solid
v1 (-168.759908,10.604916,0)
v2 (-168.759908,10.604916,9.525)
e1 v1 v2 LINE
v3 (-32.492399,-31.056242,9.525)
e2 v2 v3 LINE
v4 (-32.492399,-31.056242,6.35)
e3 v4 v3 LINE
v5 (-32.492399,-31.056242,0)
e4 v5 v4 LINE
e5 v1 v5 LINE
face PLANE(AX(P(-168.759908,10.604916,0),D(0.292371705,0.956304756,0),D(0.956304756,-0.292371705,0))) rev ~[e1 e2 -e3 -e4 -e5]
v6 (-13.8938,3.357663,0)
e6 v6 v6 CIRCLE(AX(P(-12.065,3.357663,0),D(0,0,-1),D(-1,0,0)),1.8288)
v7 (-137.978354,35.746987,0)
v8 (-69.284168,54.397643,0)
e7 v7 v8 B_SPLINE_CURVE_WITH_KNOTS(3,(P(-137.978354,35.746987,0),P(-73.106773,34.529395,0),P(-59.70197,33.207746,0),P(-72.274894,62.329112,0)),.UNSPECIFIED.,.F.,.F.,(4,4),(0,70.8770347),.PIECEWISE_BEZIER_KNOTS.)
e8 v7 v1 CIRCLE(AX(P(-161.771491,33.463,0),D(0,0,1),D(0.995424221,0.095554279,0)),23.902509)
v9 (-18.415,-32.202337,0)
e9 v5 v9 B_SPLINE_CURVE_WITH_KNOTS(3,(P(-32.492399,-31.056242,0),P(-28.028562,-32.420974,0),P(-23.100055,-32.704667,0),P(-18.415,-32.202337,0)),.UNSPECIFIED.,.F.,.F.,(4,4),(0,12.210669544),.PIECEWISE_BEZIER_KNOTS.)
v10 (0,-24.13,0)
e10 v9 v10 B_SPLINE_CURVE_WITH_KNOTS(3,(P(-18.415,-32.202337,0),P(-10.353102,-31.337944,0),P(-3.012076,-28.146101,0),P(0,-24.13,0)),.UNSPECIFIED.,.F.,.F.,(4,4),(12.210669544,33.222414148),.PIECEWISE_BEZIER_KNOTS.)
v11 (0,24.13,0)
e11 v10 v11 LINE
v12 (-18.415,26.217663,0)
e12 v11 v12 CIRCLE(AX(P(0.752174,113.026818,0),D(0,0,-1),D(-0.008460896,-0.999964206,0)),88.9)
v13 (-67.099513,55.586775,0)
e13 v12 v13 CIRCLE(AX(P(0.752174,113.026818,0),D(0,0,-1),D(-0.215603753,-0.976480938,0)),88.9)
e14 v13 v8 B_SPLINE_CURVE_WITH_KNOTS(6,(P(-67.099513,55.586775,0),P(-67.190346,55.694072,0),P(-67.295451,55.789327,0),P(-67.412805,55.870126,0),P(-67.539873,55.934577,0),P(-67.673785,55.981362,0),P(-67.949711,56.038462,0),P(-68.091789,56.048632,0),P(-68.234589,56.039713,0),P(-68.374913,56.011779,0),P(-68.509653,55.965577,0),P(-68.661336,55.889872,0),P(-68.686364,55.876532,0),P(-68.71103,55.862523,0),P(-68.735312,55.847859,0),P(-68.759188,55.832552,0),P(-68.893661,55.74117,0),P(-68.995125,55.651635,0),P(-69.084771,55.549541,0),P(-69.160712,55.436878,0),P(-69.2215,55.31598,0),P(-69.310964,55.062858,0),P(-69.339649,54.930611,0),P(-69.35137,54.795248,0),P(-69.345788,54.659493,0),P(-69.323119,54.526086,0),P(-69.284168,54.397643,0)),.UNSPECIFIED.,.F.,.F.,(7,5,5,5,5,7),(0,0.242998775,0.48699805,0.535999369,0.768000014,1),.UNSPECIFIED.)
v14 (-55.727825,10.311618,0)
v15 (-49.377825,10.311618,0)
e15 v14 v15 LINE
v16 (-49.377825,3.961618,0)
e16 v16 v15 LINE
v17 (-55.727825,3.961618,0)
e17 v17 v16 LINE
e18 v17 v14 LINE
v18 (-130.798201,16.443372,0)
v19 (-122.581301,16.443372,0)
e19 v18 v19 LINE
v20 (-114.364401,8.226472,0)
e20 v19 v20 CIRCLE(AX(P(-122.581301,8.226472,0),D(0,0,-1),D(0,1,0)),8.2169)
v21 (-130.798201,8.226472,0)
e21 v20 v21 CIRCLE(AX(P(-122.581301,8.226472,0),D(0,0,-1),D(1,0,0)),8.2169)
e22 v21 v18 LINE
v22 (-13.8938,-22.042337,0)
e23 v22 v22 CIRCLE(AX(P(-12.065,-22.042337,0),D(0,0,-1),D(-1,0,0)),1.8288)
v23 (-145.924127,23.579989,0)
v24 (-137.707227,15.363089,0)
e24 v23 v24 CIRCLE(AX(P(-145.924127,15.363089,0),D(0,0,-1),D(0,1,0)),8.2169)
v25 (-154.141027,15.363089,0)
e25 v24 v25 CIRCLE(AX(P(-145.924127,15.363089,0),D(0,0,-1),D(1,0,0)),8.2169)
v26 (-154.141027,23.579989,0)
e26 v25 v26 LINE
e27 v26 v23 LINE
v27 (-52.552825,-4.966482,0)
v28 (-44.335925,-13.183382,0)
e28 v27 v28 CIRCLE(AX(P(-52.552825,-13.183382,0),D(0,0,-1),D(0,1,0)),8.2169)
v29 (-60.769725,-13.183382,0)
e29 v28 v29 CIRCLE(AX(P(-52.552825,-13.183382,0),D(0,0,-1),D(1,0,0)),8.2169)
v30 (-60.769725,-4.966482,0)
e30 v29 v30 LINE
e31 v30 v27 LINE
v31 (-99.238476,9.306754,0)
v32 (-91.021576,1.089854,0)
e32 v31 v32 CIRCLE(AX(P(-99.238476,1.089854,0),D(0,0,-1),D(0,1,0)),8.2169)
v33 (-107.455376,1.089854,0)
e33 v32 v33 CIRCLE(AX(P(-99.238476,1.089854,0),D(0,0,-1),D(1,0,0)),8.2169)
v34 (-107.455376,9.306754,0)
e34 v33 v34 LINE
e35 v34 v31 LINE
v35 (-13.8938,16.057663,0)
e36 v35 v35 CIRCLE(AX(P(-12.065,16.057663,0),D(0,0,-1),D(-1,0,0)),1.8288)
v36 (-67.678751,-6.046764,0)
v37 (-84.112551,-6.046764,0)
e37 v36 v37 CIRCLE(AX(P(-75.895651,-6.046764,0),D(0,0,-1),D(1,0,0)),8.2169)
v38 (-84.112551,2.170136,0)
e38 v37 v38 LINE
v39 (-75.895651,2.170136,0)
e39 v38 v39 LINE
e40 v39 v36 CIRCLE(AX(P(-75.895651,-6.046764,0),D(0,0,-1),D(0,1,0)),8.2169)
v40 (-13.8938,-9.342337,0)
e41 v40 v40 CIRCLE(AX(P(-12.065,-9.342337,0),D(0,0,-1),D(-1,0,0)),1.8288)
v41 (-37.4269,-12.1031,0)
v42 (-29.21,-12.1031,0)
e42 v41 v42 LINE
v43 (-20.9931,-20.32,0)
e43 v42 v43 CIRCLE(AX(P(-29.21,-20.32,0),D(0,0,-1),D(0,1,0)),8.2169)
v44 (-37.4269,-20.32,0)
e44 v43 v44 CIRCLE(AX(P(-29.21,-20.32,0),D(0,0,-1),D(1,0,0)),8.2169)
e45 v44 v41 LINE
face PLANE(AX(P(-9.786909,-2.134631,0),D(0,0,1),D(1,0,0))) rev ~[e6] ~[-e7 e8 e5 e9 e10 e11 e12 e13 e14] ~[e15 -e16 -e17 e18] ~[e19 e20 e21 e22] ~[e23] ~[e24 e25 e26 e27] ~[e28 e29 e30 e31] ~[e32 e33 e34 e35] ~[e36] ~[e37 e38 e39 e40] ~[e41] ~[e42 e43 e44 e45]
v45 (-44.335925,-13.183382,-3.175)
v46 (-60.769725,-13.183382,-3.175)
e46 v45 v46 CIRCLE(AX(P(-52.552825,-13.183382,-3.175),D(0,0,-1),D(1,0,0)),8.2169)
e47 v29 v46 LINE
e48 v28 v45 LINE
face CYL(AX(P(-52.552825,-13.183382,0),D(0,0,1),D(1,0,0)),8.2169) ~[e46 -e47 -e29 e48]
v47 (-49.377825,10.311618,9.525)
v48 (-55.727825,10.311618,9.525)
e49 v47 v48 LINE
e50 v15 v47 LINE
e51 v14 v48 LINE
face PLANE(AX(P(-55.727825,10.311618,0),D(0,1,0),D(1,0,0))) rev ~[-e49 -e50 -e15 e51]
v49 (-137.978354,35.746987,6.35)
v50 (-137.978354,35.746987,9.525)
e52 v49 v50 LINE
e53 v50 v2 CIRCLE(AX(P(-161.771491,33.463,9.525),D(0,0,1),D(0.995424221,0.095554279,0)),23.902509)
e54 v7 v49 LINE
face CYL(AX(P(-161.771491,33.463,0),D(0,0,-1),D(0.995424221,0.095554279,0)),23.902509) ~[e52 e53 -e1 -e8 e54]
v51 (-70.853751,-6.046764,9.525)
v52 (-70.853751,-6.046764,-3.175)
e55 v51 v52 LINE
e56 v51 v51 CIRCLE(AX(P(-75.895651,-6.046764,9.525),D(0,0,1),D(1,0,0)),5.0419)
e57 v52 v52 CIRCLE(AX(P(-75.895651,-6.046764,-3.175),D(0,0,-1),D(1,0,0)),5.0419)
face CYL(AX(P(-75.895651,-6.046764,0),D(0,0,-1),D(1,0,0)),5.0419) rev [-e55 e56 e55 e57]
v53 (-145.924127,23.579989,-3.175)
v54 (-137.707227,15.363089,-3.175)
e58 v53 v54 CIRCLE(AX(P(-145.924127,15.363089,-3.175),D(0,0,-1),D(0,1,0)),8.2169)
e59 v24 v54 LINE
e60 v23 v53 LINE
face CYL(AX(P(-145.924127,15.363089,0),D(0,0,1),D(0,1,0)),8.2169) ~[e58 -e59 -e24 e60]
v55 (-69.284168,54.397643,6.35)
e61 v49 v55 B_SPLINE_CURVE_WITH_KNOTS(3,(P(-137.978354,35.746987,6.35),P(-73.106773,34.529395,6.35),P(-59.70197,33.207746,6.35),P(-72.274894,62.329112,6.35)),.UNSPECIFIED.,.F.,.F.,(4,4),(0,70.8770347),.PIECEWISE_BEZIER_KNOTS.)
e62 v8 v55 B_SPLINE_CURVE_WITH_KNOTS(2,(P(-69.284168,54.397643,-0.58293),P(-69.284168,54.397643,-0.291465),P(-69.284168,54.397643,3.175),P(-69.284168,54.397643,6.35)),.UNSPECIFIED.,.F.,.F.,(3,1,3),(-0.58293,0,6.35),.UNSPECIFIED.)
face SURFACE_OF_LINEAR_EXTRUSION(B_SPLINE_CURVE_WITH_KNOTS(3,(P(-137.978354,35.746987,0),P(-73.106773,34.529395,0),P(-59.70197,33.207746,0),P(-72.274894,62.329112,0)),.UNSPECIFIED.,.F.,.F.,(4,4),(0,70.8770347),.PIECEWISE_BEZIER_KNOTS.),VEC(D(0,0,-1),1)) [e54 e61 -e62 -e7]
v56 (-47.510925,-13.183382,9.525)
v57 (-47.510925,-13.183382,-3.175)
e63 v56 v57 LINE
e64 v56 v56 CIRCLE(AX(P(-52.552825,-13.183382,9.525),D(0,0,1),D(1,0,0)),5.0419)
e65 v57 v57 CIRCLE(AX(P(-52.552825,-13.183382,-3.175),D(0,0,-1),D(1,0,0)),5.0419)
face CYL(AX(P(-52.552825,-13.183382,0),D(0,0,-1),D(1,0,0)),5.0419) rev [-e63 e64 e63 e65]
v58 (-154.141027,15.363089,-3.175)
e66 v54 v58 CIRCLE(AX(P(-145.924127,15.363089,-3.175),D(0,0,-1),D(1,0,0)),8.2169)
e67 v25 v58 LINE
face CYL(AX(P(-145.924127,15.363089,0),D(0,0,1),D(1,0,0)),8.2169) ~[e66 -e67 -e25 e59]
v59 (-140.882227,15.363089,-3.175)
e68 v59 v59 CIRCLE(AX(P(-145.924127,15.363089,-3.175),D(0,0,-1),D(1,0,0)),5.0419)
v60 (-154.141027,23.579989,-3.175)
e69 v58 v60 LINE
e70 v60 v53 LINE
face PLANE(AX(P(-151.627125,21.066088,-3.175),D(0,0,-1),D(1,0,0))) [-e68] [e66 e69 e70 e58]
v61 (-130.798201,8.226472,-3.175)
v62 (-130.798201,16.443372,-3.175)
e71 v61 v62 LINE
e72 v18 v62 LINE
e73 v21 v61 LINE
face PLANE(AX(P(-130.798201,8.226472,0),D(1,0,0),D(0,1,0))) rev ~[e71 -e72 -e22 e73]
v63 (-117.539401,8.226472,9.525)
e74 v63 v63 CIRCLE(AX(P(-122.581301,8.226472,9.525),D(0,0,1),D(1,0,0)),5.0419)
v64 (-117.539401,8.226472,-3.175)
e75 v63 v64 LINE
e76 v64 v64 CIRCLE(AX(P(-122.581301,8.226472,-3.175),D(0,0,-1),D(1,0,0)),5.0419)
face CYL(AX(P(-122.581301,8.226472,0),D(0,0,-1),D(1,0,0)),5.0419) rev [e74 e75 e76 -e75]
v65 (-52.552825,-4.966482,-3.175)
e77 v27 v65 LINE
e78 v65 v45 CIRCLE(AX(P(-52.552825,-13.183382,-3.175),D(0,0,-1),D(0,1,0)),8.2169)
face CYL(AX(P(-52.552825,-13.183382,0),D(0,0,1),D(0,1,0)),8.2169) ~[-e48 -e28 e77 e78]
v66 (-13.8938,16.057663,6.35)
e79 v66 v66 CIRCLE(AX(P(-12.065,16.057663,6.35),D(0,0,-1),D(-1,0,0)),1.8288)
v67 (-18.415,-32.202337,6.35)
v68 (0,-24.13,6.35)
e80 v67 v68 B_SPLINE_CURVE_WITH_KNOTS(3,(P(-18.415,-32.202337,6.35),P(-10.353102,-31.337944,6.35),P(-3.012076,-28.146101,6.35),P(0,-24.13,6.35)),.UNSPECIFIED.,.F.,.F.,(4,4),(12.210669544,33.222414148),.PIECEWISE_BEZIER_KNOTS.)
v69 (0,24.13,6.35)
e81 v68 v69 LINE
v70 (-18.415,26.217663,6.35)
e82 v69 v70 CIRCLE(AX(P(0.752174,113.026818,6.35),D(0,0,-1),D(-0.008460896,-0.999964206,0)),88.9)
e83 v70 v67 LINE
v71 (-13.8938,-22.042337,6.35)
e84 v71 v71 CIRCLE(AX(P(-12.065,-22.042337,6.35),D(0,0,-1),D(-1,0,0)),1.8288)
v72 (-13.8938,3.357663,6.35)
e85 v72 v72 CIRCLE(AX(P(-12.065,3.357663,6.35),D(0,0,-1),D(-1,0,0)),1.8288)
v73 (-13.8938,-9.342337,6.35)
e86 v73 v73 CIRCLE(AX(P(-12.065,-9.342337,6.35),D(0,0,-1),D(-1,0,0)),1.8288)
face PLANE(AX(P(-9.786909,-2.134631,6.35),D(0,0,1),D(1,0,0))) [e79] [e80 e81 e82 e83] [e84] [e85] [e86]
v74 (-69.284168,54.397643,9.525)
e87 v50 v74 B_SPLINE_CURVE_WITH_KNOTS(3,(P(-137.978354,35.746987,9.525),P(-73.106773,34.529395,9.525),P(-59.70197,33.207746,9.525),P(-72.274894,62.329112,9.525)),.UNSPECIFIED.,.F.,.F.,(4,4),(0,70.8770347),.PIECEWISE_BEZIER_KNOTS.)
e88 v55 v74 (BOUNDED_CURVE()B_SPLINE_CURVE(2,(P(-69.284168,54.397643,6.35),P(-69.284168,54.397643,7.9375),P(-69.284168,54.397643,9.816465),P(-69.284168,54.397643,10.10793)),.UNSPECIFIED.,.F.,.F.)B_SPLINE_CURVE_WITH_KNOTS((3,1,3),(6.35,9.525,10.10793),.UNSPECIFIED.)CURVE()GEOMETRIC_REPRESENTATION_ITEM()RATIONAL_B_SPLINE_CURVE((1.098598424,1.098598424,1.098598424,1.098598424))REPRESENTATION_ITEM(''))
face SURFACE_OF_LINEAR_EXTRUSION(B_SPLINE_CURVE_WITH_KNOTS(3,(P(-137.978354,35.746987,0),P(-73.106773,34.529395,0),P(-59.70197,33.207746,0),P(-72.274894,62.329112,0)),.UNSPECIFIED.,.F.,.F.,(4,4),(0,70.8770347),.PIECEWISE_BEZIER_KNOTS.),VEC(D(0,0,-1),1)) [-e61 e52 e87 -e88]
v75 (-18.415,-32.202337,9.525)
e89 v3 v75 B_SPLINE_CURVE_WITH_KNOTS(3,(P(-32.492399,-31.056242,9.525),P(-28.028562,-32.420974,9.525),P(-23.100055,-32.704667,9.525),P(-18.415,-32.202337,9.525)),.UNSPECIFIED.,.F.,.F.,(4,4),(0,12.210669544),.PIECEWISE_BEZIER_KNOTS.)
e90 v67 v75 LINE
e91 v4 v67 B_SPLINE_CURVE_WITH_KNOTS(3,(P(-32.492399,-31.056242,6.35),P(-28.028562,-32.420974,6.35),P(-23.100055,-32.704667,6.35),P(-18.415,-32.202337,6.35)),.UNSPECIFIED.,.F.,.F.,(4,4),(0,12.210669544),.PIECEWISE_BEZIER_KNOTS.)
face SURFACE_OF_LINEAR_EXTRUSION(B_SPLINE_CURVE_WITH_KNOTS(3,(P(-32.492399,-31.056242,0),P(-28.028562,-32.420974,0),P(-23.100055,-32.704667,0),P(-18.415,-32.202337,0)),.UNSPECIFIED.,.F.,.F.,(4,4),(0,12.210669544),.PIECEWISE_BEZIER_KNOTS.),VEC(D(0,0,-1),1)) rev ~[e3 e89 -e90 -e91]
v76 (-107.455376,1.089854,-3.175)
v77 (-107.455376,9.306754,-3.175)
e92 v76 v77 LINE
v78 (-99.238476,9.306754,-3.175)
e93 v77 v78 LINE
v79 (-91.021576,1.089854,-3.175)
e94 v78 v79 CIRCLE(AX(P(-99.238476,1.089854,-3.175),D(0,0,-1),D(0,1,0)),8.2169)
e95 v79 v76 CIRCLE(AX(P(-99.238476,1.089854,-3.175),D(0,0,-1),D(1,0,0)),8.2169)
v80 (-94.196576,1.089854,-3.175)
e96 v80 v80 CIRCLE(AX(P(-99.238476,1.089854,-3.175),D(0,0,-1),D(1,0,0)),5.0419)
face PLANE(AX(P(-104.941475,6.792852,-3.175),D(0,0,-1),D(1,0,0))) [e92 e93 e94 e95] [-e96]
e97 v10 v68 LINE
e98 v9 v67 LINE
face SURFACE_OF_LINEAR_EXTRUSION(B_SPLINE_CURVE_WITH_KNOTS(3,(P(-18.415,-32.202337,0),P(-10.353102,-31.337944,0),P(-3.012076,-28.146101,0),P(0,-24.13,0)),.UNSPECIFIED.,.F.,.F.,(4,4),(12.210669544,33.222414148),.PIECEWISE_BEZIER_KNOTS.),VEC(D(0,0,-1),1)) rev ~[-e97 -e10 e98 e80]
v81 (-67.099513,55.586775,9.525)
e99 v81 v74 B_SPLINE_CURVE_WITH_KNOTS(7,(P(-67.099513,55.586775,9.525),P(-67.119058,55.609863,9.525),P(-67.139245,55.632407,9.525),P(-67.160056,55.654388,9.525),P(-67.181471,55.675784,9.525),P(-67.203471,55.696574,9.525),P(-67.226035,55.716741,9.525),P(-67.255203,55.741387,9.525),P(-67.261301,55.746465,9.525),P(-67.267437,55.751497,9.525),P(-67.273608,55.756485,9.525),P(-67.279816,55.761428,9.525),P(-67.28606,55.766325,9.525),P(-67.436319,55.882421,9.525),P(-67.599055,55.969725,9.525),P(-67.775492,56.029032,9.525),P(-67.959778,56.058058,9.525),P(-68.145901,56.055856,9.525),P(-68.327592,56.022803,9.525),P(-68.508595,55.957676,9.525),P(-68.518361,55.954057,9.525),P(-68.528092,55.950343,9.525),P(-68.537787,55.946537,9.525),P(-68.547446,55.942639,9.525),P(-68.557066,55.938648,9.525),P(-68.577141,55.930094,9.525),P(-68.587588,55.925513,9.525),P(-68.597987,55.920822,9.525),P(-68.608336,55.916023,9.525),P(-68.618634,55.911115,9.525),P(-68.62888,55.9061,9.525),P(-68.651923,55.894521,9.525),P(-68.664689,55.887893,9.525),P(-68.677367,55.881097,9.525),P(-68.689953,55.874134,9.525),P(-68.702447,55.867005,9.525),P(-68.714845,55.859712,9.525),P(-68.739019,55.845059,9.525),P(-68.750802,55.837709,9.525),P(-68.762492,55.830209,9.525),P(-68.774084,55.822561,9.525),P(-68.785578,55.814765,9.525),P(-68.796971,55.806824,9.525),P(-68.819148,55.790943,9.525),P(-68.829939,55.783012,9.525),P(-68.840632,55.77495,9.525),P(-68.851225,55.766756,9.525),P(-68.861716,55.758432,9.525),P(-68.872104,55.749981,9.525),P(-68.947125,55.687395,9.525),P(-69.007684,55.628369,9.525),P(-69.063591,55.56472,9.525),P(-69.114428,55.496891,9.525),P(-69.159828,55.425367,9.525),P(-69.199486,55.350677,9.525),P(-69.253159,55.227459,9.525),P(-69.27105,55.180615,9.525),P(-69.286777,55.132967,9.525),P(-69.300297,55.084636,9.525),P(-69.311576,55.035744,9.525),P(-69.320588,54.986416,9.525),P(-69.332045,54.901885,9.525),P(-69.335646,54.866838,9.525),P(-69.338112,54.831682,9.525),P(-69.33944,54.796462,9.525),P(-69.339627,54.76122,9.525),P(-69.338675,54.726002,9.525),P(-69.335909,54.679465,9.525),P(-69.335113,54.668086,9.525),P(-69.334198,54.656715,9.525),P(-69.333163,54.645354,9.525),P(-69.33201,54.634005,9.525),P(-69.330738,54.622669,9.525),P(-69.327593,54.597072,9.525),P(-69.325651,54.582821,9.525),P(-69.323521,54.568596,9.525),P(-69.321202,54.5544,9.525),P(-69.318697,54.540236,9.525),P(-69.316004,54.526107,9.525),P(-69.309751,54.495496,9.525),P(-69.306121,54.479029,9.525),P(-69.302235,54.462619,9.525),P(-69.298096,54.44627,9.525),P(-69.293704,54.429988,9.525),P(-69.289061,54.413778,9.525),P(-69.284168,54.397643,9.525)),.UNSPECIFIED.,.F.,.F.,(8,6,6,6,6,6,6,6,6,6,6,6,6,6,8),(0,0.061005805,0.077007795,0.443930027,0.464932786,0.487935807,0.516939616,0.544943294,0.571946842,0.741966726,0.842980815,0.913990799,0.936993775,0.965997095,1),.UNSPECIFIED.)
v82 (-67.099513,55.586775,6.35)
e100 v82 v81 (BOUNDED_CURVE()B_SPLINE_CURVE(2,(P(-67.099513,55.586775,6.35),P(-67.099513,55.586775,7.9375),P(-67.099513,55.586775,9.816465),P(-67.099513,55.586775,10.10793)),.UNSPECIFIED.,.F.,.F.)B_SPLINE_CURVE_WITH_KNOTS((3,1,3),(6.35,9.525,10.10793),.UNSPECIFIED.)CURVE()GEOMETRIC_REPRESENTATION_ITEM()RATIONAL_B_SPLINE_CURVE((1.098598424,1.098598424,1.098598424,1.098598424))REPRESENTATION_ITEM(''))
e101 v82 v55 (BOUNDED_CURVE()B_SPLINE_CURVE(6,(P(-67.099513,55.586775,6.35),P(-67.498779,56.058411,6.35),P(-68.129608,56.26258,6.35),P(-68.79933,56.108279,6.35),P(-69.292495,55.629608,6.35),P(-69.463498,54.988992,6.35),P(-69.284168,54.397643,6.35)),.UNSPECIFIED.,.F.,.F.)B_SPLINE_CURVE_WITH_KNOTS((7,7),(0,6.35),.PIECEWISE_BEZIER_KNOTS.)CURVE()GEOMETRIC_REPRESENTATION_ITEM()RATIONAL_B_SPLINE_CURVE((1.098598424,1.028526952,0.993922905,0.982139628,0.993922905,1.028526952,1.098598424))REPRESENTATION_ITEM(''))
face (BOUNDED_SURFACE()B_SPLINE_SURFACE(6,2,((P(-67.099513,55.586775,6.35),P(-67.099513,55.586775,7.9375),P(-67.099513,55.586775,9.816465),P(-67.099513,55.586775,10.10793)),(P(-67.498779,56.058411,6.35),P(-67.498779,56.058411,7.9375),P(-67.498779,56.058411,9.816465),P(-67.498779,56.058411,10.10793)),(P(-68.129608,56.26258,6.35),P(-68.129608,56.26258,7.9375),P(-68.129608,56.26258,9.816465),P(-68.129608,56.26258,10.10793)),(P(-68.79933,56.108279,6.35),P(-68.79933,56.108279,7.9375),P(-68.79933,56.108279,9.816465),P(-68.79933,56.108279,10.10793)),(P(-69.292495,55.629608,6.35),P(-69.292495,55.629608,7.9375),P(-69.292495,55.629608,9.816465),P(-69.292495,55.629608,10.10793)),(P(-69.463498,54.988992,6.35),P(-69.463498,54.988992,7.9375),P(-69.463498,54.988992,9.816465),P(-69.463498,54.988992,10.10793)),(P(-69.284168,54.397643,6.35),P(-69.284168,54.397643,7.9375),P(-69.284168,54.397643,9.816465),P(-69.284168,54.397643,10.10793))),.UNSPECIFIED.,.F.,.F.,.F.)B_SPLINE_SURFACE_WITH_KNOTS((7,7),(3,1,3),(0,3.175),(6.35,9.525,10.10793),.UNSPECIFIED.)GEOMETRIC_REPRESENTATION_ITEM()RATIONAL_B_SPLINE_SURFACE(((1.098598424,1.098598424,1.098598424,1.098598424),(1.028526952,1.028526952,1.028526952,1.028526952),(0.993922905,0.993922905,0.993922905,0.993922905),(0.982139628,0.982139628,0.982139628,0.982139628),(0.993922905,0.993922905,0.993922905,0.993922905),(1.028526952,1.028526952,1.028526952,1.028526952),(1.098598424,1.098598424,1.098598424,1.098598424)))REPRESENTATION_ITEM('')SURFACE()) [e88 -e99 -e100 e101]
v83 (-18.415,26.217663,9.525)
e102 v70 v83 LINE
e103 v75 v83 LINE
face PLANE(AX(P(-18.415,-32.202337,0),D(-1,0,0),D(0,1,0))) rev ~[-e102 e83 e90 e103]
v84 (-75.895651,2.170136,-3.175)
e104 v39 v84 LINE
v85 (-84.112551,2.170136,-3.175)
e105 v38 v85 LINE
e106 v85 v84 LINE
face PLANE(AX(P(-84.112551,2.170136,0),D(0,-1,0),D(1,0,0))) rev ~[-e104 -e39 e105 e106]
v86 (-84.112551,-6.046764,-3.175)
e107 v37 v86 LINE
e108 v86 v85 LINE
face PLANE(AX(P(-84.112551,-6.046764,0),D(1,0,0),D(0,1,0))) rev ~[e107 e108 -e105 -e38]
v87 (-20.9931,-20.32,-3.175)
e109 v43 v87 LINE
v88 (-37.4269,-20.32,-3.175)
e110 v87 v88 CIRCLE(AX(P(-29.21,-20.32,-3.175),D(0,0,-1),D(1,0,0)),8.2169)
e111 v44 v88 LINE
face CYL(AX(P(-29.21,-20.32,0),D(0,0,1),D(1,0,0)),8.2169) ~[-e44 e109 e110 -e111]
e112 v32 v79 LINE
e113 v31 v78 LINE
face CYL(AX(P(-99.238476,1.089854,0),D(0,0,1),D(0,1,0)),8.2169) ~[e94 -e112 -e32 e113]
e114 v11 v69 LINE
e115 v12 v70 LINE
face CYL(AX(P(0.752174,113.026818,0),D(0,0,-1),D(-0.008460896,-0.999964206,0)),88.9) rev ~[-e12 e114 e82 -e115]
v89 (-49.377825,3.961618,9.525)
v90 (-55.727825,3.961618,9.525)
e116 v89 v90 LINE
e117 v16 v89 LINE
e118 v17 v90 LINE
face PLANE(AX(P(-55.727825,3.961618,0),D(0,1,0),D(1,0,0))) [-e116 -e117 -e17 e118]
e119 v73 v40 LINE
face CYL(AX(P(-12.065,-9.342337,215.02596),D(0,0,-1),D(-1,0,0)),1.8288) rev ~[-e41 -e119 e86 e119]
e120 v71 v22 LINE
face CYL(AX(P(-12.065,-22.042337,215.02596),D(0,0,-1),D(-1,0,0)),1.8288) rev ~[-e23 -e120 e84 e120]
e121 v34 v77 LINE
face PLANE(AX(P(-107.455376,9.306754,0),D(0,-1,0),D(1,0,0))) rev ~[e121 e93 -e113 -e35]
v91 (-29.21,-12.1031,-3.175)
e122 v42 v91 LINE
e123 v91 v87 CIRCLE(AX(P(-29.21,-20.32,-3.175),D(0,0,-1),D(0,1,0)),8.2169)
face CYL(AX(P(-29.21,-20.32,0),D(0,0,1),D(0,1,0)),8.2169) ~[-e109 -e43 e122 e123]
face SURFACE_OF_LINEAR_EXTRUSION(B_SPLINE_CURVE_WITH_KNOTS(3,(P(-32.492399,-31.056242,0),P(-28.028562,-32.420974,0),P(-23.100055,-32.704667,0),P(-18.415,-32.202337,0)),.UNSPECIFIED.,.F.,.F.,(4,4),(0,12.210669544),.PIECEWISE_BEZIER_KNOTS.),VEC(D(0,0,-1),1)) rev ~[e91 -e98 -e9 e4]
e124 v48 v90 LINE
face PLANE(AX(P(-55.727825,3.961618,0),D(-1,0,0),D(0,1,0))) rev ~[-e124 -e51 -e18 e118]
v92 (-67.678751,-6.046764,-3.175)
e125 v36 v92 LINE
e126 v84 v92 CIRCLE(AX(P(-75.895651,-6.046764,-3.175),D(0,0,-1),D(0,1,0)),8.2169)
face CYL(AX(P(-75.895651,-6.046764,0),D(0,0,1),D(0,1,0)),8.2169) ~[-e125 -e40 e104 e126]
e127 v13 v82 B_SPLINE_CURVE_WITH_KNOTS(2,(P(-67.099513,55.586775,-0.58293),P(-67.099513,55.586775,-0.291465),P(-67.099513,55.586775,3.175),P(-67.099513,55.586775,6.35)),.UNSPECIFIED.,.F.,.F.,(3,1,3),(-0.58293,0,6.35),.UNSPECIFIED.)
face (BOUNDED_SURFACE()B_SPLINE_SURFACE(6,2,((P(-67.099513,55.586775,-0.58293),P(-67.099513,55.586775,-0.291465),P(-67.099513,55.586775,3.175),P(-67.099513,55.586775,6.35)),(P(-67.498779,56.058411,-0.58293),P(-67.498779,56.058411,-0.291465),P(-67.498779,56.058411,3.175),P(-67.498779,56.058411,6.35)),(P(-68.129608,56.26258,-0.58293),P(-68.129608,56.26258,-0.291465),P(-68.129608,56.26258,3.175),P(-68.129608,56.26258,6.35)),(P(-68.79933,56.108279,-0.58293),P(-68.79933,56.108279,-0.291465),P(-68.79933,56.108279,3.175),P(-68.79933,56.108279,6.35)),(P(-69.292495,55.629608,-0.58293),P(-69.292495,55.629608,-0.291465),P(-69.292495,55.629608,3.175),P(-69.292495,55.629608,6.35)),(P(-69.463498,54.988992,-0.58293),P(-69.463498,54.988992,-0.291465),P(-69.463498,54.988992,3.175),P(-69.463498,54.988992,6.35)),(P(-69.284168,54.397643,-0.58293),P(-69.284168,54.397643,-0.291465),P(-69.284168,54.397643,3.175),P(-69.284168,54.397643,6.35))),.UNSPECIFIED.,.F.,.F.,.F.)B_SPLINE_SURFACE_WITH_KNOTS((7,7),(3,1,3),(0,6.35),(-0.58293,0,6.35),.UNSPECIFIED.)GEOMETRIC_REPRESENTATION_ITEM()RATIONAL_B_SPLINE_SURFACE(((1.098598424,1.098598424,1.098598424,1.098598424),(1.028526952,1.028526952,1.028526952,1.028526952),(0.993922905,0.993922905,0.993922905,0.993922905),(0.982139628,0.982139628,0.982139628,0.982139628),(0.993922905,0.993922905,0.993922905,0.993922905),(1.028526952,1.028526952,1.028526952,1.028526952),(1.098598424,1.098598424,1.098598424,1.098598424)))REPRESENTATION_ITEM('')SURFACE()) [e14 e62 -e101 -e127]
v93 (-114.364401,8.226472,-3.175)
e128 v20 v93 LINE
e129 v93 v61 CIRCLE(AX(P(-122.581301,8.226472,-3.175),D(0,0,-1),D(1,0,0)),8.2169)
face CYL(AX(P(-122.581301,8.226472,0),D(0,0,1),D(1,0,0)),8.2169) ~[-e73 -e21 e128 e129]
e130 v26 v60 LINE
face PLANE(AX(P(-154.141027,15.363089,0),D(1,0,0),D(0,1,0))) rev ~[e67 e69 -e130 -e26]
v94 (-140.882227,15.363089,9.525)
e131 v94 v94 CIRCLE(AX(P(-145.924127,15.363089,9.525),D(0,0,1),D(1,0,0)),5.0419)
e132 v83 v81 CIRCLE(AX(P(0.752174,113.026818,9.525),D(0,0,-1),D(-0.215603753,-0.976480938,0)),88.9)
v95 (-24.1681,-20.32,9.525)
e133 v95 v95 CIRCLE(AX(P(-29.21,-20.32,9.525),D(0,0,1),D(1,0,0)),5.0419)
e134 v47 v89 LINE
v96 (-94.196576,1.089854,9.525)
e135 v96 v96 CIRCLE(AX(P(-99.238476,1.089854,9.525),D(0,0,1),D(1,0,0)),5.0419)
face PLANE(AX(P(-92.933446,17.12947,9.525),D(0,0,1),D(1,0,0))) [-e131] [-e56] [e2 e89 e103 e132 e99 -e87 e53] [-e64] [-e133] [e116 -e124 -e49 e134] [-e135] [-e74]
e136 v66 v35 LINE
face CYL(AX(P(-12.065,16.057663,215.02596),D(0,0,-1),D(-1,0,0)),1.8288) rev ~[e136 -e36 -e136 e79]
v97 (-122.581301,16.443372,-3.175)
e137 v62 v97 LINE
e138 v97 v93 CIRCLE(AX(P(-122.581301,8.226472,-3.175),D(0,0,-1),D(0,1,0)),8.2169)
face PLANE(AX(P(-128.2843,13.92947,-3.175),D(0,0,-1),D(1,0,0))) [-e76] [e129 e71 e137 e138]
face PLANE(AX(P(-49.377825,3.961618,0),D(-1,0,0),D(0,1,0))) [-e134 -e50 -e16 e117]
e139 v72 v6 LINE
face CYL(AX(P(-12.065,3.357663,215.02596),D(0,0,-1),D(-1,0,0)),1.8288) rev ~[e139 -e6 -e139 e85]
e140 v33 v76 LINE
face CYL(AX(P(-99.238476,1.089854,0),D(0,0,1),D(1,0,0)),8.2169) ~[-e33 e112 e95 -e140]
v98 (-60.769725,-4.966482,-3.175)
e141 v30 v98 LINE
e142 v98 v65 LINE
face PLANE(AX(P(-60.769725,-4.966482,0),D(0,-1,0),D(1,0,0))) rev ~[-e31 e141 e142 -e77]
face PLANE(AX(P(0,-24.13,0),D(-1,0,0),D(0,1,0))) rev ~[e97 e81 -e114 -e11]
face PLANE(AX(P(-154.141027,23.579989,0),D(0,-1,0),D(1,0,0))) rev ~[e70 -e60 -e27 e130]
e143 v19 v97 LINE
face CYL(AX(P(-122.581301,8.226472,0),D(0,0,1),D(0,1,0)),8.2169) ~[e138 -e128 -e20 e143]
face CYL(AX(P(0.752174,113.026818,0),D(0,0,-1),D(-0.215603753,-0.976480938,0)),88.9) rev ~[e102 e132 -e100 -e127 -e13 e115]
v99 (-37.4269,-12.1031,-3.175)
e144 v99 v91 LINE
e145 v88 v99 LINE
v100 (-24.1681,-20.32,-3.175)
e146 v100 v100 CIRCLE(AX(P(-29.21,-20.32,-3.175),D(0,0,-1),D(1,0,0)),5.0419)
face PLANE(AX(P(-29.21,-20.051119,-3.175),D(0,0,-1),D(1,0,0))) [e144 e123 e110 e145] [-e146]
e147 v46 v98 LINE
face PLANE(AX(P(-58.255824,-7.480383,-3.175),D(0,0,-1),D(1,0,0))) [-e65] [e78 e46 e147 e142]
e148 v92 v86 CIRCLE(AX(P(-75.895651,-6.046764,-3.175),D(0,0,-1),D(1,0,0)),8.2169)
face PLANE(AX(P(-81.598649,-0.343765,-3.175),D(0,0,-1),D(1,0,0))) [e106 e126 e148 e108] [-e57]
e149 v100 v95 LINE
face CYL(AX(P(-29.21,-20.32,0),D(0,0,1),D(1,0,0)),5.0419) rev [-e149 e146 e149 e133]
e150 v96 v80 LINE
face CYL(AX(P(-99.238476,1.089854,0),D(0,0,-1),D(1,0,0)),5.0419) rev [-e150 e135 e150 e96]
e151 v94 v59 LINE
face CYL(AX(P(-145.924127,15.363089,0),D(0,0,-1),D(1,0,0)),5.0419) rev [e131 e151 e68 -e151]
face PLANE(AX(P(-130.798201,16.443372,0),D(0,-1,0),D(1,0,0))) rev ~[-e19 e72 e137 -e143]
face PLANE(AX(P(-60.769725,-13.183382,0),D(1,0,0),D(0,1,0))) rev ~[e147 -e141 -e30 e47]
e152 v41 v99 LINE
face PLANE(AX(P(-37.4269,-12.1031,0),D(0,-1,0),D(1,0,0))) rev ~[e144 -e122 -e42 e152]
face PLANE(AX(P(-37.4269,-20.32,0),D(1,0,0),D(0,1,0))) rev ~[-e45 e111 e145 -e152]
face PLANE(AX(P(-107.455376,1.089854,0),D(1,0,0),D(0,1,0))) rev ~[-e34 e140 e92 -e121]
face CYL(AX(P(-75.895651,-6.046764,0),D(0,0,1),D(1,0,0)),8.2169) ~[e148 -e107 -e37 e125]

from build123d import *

# Parameters (mm, degrees)
F0_R      = 5.0419
F1_DEPTH  = 6.35
F2_DEPTH  = 9.525
F4_D      = 3.6576
F5_R      = 1.27
F8_W      = 6.35
F8_H      = 6.35
F9_DEPTH  = 9.5260001
F10_R     = 5.0419
F11_DEPTH = 3.175


with BuildPart() as f1:
    # F0 (on Top) → F1 (new body)
    with BuildSketch(Plane.XY):
        with BuildLine():
            Line((0, 0), (0, 24.13))
            ThreePointArc((0, 24.13), (-9.2620503813, 24.6926494565), (-18.415, 26.2176625565))
            Line((-18.415, 26.2176625565), (-18.415, -32.2023374435))
            add(Edge.make_bspline(
                [(-18.415, -32.2023374435), (-10.35310168, -31.3379440787), (-3.0120759205, -28.1461012273), (0, -24.13)],
                knots=[12.2106695442, 12.2106695442, 12.2106695442, 12.2106695442, 33.2224141479, 33.2224141479, 33.2224141479, 33.2224141479], degree=3))
            Line((0, -24.13), (0, 0))
        make_face()
        with BuildLine():
            Line((-18.415, -32.2023374435), (-18.415, 26.2176625565))
            ThreePointArc((-18.415, 26.2176625565), (-48.7549341061, 39.1874227389), (-72.2748938826, 62.3291118058))
            add(Edge.make_bspline(
                [(-137.9783539955, 35.7469866649), (-73.1067731977, 34.5293954015), (-59.7019699566, 33.2077455579), (-72.2748938826, 62.3291118058)],
                knots=[0, 0, 0, 0, 70.8770346997, 70.8770346997, 70.8770346997, 70.8770346997], degree=3))
            ThreePointArc((-137.9783539955, 35.7469866649), (-162.9147928474, 57.3381501066), (-185.674, 33.4629996115))
            ThreePointArc((-185.674, 33.4629996115), (-180.9856867862, 19.2452424177), (-168.7599080893, 10.6049162859))
            Line((-168.7599080893, 10.6049162859), (-32.4923986546, -31.0562422342))
            add(Edge.make_bspline(
                [(-32.4923986546, -31.0562422342), (-28.0285616621, -32.4209741599), (-23.1000548653, -32.7046670659), (-18.415, -32.2023374435)],
                knots=[0, 0, 0, 0, 12.2106695442, 12.2106695442, 12.2106695442, 12.2106695442], degree=3))
        make_face()
        with Locations((-99.2384759306, 1.0898536678)):
            Circle(F0_R, mode=Mode.SUBTRACT)
        with Locations((-122.5813012408, 8.226471557)):
            Circle(F0_R, mode=Mode.SUBTRACT)
        with Locations((-52.5528253102, -13.1833821107)):
            Circle(F0_R, mode=Mode.SUBTRACT)
        with Locations((-29.21, -20.32)):
            Circle(F0_R, mode=Mode.SUBTRACT)
        with Locations((-75.8956506204, -6.0467642215)):
            Circle(F0_R, mode=Mode.SUBTRACT)
        with Locations((-145.924126551, 15.3630894463)):
            Circle(F0_R, mode=Mode.SUBTRACT)
    extrude(amount=F1_DEPTH)

    # F0 (on Top) → F2 (join)
    with BuildSketch(Plane.XY):
        with BuildLine():
            Line((-18.415, -32.2023374435), (-18.415, 26.2176625565))
            ThreePointArc((-18.415, 26.2176625565), (-48.7549341061, 39.1874227389), (-72.2748938826, 62.3291118058))
            add(Edge.make_bspline(
                [(-137.9783539955, 35.7469866649), (-73.1067731977, 34.5293954015), (-59.7019699566, 33.2077455579), (-72.2748938826, 62.3291118058)],
                knots=[0, 0, 0, 0, 70.8770346997, 70.8770346997, 70.8770346997, 70.8770346997], degree=3))
            ThreePointArc((-137.9783539955, 35.7469866649), (-162.9147928474, 57.3381501066), (-185.674, 33.4629996115))
            ThreePointArc((-185.674, 33.4629996115), (-180.9856867862, 19.2452424177), (-168.7599080893, 10.6049162859))
            Line((-168.7599080893, 10.6049162859), (-32.4923986546, -31.0562422342))
            add(Edge.make_bspline(
                [(-32.4923986546, -31.0562422342), (-28.0285616621, -32.4209741599), (-23.1000548653, -32.7046670659), (-18.415, -32.2023374435)],
                knots=[0, 0, 0, 0, 12.2106695442, 12.2106695442, 12.2106695442, 12.2106695442], degree=3))
        make_face()
        with Locations((-99.2384759306, 1.0898536678)):
            Circle(F0_R, mode=Mode.SUBTRACT)
        with Locations((-122.5813012408, 8.226471557)):
            Circle(F0_R, mode=Mode.SUBTRACT)
        with Locations((-52.5528253102, -13.1833821107)):
            Circle(F0_R, mode=Mode.SUBTRACT)
        with Locations((-29.21, -20.32)):
            Circle(F0_R, mode=Mode.SUBTRACT)
        with Locations((-75.8956506204, -6.0467642215)):
            Circle(F0_R, mode=Mode.SUBTRACT)
        with Locations((-145.924126551, 15.3630894463)):
            Circle(F0_R, mode=Mode.SUBTRACT)
    extrude(amount=F2_DEPTH)

    # F4 (through all)
    with Locations(Plane.XY.offset(6.35)):
        with Locations((-12.065, 16.0576625565), (-12.065, 3.3576625565), (-12.065, -9.3423374435), (-12.065, -22.0423374435)):
            Hole(F4_D / 2)

    # F5
    f5_edges = [f1.edges().sort_by_distance(p)[0] for p in [
        (-72.274894, 62.329112, 3.175),
        (-72.274894, 62.329112, 7.9375),
    ]]
    fillet(f5_edges, radius=F5_R)

    # F8 (on Top) → F9 (cut, through all)
    with BuildSketch(Plane.XY):
        with Locations((-52.5528253102, 7.1366178893)):
            Rectangle(F8_W, F8_H)
    extrude(amount=F9_DEPTH, mode=Mode.SUBTRACT)

    # F10 (on face) → F11 (join)
    with BuildSketch(Plane(origin=(0, 0, 0), x_dir=(1, 0, 0), z_dir=(0, 0, -1))):
        with BuildLine():
            ThreePointArc((-29.21, 12.1031), (-23.3997742897, 14.5097742897), (-20.9931, 20.32))
            ThreePointArc((-20.9931, 20.32), (-29.21, 28.5369), (-37.4269, 20.32))
            ThreePointArc((-37.4269, 20.32), (-35.0202257103, 14.5097742897), (-29.21, 12.1031))
        make_face()
        with Locations((-29.21, 20.32)):
            Circle(F10_R, mode=Mode.SUBTRACT)
        with BuildLine():
            ThreePointArc((-29.21, 12.1031), (-35.0202257103, 14.5097742897), (-37.4269, 20.32))
            Line((-37.4269, 20.32), (-37.4269, 12.1031))
            Line((-37.4269, 12.1031), (-29.21, 12.1031))
        make_face()
        with BuildLine():
            ThreePointArc((-52.5528253102, 4.9664821107), (-58.3630510205, 7.3731564004), (-60.7697253102, 13.1833821107))
            Line((-60.7697253102, 13.1833821107), (-60.7697253102, 4.9664821107))
            Line((-60.7697253102, 4.9664821107), (-52.5528253102, 4.9664821107))
        make_face()
        with BuildLine():
            ThreePointArc((-44.3359253102, 13.1833821107), (-52.5528253102, 21.4002821107), (-60.7697253102, 13.1833821107))
            ThreePointArc((-60.7697253102, 13.1833821107), (-58.3630510205, 7.3731564004), (-52.5528253102, 4.9664821107))
            ThreePointArc((-52.5528253102, 4.9664821107), (-46.7425995999, 7.3731564004), (-44.3359253102, 13.1833821107))
        make_face()
        with Locations((-52.5528253102, 13.1833821107)):
            Circle(F10_R, mode=Mode.SUBTRACT)
        with BuildLine():
            ThreePointArc((-75.8956506204, -2.1701357785), (-81.7058763307, 0.2365385111), (-84.1125506204, 6.0467642215))
            Line((-84.1125506204, 6.0467642215), (-84.1125506204, -2.1701357785))
            Line((-84.1125506204, -2.1701357785), (-75.8956506204, -2.1701357785))
        make_face()
        with BuildLine():
            ThreePointArc((-67.6787506204, 6.0467642215), (-75.8956506204, 14.2636642215), (-84.1125506204, 6.0467642215))
            ThreePointArc((-84.1125506204, 6.0467642215), (-81.7058763307, 0.2365385111), (-75.8956506204, -2.1701357785))
            ThreePointArc((-75.8956506204, -2.1701357785), (-70.0854249101, 0.2365385111), (-67.6787506204, 6.0467642215))
        make_face()
        with Locations((-75.8956506204, 6.0467642215)):
            Circle(F10_R, mode=Mode.SUBTRACT)
        with BuildLine():
            ThreePointArc((-99.2384759306, -9.3067536678), (-105.0487016409, -6.9000793781), (-107.4553759306, -1.0898536678))
            Line((-107.4553759306, -1.0898536678), (-107.4553759306, -9.3067536678))
            Line((-107.4553759306, -9.3067536678), (-99.2384759306, -9.3067536678))
        make_face()
        with BuildLine():
            ThreePointArc((-91.0215759306, -1.0898536678), (-99.2384759306, 7.1270463322), (-107.4553759306, -1.0898536678))
            ThreePointArc((-107.4553759306, -1.0898536678), (-105.0487016409, -6.9000793781), (-99.2384759306, -9.3067536678))
            ThreePointArc((-99.2384759306, -9.3067536678), (-93.4282502203, -6.9000793781), (-91.0215759306, -1.0898536678))
        make_face()
        with Locations((-99.2384759306, -1.0898536678)):
            Circle(F10_R, mode=Mode.SUBTRACT)
        with BuildLine():
            ThreePointArc((-122.5813012408, -16.443371557), (-128.3915269511, -14.0366972674), (-130.7982012408, -8.226471557))
            Line((-130.7982012408, -8.226471557), (-130.7982012408, -16.443371557))
            Line((-130.7982012408, -16.443371557), (-122.5813012408, -16.443371557))
        make_face()
        with BuildLine():
            ThreePointArc((-114.3644012408, -8.226471557), (-122.5813012408, -0.009571557), (-130.7982012408, -8.226471557))
            ThreePointArc((-130.7982012408, -8.226471557), (-128.3915269511, -14.0366972674), (-122.5813012408, -16.443371557))
            ThreePointArc((-122.5813012408, -16.443371557), (-116.7710755305, -14.0366972674), (-114.3644012408, -8.226471557))
        make_face()
        with Locations((-122.5813012408, -8.226471557)):
            Circle(F10_R, mode=Mode.SUBTRACT)
        with BuildLine():
            ThreePointArc((-145.924126551, -23.5799894463), (-151.7343522614, -21.1733151566), (-154.141026551, -15.3630894463))
            Line((-154.141026551, -15.3630894463), (-154.141026551, -23.5799894463))
            Line((-154.141026551, -23.5799894463), (-145.924126551, -23.5799894463))
        make_face()
        with BuildLine():
            ThreePointArc((-137.707226551, -15.3630894463), (-145.924126551, -7.1461894463), (-154.141026551, -15.3630894463))
            ThreePointArc((-154.141026551, -15.3630894463), (-151.7343522614, -21.1733151566), (-145.924126551, -23.5799894463))
            ThreePointArc((-145.924126551, -23.5799894463), (-140.1139008407, -21.1733151566), (-137.707226551, -15.3630894463))
        make_face()
        with Locations((-145.924126551, -15.3630894463)):
            Circle(F10_R, mode=Mode.SUBTRACT)
    extrude(amount=F11_DEPTH)


solid = f1.part
